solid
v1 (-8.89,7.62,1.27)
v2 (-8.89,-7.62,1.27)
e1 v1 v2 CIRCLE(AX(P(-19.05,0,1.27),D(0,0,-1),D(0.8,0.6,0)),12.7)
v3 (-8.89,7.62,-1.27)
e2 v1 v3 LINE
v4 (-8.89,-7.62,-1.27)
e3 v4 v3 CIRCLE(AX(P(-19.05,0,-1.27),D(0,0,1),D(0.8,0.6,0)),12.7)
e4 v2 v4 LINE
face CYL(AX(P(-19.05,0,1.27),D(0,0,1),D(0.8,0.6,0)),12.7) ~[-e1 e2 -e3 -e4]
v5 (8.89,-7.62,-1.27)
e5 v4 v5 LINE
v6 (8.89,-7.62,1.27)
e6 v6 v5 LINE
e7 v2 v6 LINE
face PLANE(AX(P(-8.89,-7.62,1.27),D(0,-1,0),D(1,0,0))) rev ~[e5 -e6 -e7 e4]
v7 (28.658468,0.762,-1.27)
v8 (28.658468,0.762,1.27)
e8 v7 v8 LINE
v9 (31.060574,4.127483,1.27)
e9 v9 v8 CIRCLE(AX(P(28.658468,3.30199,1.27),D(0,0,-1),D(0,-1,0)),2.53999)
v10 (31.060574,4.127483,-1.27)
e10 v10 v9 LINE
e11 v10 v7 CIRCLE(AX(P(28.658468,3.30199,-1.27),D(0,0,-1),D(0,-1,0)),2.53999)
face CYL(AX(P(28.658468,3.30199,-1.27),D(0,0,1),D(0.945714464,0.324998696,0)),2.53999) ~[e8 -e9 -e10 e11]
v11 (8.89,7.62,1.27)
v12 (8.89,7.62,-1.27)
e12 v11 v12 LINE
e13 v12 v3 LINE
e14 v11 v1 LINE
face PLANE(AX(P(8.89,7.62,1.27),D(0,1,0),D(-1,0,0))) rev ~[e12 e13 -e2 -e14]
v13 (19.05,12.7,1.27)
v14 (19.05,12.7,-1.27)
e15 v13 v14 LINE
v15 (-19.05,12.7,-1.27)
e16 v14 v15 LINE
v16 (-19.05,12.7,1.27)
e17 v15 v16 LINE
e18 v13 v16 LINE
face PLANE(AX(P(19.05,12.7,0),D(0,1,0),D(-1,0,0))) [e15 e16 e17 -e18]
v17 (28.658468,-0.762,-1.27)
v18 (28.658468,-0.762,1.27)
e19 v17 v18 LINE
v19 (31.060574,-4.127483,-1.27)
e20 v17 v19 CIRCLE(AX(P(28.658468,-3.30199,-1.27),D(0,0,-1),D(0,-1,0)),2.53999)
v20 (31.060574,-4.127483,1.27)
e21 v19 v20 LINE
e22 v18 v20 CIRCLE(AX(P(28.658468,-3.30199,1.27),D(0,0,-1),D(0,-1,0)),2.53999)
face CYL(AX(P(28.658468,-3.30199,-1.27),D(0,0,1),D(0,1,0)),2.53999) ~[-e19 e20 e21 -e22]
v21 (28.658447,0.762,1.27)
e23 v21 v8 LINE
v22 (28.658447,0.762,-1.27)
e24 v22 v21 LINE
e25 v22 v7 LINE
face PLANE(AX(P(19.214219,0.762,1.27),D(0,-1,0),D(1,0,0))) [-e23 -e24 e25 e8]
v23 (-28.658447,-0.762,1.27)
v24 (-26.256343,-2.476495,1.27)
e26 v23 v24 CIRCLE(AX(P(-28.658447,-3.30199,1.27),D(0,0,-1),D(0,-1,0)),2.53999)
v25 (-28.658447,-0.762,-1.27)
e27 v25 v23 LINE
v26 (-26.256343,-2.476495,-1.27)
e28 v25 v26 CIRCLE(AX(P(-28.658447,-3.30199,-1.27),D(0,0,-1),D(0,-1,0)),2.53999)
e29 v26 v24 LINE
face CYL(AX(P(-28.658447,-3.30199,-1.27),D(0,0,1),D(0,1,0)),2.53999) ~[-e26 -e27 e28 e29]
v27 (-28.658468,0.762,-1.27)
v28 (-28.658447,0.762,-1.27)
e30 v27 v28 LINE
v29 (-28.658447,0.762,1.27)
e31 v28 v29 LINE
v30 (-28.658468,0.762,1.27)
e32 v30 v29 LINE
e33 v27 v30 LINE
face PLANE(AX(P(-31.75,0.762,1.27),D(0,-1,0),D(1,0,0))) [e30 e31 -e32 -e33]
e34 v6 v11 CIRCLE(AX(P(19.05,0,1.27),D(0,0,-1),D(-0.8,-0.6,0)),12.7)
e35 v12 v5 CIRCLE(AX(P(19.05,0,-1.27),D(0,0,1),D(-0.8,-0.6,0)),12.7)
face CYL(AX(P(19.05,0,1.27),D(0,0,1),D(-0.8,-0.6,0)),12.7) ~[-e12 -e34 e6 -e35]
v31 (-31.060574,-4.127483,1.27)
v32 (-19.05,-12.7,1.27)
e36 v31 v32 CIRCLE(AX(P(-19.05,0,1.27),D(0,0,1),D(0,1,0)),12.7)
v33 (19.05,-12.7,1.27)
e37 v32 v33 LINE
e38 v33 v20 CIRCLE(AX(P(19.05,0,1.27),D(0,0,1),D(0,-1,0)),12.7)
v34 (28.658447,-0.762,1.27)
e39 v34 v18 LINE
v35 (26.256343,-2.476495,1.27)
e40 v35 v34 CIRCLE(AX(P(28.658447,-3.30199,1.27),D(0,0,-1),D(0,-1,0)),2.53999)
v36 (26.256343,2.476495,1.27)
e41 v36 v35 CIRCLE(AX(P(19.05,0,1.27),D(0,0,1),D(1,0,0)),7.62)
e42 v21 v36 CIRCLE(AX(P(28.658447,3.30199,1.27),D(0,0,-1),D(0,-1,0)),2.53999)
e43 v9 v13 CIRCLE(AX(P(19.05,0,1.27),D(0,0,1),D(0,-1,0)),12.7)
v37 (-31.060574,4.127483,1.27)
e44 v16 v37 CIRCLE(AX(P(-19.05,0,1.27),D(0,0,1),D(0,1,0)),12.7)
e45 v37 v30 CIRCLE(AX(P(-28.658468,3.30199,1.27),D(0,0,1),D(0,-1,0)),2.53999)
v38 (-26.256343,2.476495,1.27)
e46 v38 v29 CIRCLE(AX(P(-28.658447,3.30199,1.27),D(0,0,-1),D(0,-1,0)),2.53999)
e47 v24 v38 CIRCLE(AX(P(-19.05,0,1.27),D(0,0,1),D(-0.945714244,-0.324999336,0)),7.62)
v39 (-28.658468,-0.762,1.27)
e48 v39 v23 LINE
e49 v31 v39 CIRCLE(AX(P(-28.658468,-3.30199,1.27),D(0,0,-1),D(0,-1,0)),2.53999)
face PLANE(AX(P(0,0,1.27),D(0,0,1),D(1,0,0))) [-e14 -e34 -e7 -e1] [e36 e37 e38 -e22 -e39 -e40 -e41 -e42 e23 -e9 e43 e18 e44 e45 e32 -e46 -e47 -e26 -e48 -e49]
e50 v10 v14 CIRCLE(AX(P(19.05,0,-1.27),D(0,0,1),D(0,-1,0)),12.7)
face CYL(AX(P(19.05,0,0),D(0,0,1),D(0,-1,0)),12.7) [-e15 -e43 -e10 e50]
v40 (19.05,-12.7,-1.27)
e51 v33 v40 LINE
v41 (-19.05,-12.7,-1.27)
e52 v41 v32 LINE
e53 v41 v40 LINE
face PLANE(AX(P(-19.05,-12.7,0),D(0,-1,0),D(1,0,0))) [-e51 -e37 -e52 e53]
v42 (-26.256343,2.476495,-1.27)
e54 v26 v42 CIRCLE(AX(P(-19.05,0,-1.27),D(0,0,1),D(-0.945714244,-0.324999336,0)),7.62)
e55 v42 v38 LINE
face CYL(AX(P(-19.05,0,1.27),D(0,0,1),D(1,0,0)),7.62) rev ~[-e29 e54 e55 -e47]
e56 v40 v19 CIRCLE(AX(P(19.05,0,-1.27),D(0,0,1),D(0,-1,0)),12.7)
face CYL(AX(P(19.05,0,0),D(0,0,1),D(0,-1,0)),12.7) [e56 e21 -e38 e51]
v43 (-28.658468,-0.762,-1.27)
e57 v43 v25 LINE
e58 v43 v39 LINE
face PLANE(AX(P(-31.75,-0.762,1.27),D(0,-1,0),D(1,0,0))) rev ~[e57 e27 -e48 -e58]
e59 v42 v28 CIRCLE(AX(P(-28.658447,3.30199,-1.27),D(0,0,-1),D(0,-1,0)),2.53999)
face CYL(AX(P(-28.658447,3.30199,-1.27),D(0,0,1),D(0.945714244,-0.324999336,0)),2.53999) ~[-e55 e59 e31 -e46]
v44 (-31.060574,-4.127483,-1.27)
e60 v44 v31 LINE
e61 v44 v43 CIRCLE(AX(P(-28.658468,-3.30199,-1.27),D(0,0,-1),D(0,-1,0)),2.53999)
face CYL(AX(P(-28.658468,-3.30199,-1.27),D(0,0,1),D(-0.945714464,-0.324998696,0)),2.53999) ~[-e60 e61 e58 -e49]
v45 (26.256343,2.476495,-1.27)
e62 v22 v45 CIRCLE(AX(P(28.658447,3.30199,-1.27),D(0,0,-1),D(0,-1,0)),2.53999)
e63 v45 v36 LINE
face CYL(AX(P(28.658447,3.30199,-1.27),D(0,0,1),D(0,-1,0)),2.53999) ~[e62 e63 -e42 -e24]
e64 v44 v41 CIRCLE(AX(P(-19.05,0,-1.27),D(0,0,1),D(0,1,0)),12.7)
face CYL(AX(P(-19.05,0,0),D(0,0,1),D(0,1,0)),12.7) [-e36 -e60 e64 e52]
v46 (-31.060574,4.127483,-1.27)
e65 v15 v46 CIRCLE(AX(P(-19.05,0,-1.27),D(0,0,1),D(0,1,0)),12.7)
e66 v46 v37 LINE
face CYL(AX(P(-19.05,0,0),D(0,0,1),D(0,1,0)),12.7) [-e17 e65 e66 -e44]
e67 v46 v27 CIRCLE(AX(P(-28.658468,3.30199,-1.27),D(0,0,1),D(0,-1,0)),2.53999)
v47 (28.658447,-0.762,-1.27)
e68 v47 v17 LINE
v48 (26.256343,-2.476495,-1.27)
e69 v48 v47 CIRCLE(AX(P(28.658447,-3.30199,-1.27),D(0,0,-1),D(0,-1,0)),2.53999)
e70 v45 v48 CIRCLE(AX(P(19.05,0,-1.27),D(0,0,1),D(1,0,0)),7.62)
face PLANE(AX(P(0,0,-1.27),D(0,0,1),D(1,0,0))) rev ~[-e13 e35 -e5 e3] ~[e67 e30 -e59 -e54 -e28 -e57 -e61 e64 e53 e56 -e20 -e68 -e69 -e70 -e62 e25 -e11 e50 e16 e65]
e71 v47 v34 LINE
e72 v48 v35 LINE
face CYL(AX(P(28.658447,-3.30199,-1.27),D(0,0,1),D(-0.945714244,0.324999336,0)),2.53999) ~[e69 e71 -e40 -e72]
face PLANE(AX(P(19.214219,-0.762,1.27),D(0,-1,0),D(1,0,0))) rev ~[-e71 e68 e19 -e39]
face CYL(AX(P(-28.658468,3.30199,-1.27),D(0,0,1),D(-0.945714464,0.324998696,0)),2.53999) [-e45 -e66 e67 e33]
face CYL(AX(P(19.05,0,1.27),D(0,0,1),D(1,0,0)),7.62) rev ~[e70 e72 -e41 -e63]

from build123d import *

# Parameters (mm, degrees)
F1_DEPTH = 1.27
F2_R     = 7.62
F3_DEPTH = 25.4
F5_W     = 12.5357808316
F5_H     = 1.524
F6_DEPTH = 25.4
F7_R     = 2.53999


# Not quite as in the source:
# - a fillet or chamfer is up to 0.001 mm smaller than in the source, because OpenCascade refuses the exact size


with BuildPart() as f1:
    # F0 (on Top) → F1 (new body, symmetric)
    with BuildSketch(Plane.XY):
        with BuildLine():
            Line((19.05, 12.7), (-19.05, 12.7))
            ThreePointArc((-19.05, 12.7), (-31.75, 0), (-19.05, -12.7))
            Line((-19.05, -12.7), (19.05, -12.7))
            ThreePointArc((19.05, -12.7), (31.75, 0), (19.05, 12.7))
        make_face()
    extrude(amount=F1_DEPTH, both=True)

    # F2 (on face) → F3 (cut)
    with BuildSketch(Plane.XY.offset(1.27)):
        with Locations((-19.05, 0)):
            Circle(F2_R)
        with Locations((19.05, 0)):
            Circle(F2_R)
        with BuildLine():
            Line((8.89, 7.62), (-8.89, 7.62))
            ThreePointArc((-8.89, 7.62), (-6.35, 0), (-8.89, -7.62))
            Line((-8.89, -7.62), (8.89, -7.62))
            ThreePointArc((8.89, -7.62), (6.35, 0), (8.89, 7.62))
        make_face()
    extrude(amount=-F3_DEPTH, mode=Mode.SUBTRACT)

    # F5 (on face) → F6 (cut)
    with BuildSketch(Plane.XY.offset(1.27)):
        with Locations((-25.4821095842, 0)):
            Rectangle(F5_W, F5_H)
        with Locations((25.4821095842, 0)):
            Rectangle(F5_W, F5_H)
    extrude(amount=-F6_DEPTH, mode=Mode.SUBTRACT)

    # F7 (radius 2.54 in the source; OpenCascade refuses exactly that, so slightly less here)
    f7_edges = [f1.edges().sort_by_distance(p)[0] for p in [
        (26.631804, 0.762, 0),
        (26.631804, -0.762, 0),
        (-26.631804, 0.762, 0),
        (-26.631804, -0.762, 0),
        (-31.727119, -0.762, 0),
        (-31.727119, 0.762, 0),
        (31.727119, 0.762, 0),
        (31.727119, -0.762, 0),
    ]]
    fillet(f7_edges, radius=F7_R)


solid = f1.part
